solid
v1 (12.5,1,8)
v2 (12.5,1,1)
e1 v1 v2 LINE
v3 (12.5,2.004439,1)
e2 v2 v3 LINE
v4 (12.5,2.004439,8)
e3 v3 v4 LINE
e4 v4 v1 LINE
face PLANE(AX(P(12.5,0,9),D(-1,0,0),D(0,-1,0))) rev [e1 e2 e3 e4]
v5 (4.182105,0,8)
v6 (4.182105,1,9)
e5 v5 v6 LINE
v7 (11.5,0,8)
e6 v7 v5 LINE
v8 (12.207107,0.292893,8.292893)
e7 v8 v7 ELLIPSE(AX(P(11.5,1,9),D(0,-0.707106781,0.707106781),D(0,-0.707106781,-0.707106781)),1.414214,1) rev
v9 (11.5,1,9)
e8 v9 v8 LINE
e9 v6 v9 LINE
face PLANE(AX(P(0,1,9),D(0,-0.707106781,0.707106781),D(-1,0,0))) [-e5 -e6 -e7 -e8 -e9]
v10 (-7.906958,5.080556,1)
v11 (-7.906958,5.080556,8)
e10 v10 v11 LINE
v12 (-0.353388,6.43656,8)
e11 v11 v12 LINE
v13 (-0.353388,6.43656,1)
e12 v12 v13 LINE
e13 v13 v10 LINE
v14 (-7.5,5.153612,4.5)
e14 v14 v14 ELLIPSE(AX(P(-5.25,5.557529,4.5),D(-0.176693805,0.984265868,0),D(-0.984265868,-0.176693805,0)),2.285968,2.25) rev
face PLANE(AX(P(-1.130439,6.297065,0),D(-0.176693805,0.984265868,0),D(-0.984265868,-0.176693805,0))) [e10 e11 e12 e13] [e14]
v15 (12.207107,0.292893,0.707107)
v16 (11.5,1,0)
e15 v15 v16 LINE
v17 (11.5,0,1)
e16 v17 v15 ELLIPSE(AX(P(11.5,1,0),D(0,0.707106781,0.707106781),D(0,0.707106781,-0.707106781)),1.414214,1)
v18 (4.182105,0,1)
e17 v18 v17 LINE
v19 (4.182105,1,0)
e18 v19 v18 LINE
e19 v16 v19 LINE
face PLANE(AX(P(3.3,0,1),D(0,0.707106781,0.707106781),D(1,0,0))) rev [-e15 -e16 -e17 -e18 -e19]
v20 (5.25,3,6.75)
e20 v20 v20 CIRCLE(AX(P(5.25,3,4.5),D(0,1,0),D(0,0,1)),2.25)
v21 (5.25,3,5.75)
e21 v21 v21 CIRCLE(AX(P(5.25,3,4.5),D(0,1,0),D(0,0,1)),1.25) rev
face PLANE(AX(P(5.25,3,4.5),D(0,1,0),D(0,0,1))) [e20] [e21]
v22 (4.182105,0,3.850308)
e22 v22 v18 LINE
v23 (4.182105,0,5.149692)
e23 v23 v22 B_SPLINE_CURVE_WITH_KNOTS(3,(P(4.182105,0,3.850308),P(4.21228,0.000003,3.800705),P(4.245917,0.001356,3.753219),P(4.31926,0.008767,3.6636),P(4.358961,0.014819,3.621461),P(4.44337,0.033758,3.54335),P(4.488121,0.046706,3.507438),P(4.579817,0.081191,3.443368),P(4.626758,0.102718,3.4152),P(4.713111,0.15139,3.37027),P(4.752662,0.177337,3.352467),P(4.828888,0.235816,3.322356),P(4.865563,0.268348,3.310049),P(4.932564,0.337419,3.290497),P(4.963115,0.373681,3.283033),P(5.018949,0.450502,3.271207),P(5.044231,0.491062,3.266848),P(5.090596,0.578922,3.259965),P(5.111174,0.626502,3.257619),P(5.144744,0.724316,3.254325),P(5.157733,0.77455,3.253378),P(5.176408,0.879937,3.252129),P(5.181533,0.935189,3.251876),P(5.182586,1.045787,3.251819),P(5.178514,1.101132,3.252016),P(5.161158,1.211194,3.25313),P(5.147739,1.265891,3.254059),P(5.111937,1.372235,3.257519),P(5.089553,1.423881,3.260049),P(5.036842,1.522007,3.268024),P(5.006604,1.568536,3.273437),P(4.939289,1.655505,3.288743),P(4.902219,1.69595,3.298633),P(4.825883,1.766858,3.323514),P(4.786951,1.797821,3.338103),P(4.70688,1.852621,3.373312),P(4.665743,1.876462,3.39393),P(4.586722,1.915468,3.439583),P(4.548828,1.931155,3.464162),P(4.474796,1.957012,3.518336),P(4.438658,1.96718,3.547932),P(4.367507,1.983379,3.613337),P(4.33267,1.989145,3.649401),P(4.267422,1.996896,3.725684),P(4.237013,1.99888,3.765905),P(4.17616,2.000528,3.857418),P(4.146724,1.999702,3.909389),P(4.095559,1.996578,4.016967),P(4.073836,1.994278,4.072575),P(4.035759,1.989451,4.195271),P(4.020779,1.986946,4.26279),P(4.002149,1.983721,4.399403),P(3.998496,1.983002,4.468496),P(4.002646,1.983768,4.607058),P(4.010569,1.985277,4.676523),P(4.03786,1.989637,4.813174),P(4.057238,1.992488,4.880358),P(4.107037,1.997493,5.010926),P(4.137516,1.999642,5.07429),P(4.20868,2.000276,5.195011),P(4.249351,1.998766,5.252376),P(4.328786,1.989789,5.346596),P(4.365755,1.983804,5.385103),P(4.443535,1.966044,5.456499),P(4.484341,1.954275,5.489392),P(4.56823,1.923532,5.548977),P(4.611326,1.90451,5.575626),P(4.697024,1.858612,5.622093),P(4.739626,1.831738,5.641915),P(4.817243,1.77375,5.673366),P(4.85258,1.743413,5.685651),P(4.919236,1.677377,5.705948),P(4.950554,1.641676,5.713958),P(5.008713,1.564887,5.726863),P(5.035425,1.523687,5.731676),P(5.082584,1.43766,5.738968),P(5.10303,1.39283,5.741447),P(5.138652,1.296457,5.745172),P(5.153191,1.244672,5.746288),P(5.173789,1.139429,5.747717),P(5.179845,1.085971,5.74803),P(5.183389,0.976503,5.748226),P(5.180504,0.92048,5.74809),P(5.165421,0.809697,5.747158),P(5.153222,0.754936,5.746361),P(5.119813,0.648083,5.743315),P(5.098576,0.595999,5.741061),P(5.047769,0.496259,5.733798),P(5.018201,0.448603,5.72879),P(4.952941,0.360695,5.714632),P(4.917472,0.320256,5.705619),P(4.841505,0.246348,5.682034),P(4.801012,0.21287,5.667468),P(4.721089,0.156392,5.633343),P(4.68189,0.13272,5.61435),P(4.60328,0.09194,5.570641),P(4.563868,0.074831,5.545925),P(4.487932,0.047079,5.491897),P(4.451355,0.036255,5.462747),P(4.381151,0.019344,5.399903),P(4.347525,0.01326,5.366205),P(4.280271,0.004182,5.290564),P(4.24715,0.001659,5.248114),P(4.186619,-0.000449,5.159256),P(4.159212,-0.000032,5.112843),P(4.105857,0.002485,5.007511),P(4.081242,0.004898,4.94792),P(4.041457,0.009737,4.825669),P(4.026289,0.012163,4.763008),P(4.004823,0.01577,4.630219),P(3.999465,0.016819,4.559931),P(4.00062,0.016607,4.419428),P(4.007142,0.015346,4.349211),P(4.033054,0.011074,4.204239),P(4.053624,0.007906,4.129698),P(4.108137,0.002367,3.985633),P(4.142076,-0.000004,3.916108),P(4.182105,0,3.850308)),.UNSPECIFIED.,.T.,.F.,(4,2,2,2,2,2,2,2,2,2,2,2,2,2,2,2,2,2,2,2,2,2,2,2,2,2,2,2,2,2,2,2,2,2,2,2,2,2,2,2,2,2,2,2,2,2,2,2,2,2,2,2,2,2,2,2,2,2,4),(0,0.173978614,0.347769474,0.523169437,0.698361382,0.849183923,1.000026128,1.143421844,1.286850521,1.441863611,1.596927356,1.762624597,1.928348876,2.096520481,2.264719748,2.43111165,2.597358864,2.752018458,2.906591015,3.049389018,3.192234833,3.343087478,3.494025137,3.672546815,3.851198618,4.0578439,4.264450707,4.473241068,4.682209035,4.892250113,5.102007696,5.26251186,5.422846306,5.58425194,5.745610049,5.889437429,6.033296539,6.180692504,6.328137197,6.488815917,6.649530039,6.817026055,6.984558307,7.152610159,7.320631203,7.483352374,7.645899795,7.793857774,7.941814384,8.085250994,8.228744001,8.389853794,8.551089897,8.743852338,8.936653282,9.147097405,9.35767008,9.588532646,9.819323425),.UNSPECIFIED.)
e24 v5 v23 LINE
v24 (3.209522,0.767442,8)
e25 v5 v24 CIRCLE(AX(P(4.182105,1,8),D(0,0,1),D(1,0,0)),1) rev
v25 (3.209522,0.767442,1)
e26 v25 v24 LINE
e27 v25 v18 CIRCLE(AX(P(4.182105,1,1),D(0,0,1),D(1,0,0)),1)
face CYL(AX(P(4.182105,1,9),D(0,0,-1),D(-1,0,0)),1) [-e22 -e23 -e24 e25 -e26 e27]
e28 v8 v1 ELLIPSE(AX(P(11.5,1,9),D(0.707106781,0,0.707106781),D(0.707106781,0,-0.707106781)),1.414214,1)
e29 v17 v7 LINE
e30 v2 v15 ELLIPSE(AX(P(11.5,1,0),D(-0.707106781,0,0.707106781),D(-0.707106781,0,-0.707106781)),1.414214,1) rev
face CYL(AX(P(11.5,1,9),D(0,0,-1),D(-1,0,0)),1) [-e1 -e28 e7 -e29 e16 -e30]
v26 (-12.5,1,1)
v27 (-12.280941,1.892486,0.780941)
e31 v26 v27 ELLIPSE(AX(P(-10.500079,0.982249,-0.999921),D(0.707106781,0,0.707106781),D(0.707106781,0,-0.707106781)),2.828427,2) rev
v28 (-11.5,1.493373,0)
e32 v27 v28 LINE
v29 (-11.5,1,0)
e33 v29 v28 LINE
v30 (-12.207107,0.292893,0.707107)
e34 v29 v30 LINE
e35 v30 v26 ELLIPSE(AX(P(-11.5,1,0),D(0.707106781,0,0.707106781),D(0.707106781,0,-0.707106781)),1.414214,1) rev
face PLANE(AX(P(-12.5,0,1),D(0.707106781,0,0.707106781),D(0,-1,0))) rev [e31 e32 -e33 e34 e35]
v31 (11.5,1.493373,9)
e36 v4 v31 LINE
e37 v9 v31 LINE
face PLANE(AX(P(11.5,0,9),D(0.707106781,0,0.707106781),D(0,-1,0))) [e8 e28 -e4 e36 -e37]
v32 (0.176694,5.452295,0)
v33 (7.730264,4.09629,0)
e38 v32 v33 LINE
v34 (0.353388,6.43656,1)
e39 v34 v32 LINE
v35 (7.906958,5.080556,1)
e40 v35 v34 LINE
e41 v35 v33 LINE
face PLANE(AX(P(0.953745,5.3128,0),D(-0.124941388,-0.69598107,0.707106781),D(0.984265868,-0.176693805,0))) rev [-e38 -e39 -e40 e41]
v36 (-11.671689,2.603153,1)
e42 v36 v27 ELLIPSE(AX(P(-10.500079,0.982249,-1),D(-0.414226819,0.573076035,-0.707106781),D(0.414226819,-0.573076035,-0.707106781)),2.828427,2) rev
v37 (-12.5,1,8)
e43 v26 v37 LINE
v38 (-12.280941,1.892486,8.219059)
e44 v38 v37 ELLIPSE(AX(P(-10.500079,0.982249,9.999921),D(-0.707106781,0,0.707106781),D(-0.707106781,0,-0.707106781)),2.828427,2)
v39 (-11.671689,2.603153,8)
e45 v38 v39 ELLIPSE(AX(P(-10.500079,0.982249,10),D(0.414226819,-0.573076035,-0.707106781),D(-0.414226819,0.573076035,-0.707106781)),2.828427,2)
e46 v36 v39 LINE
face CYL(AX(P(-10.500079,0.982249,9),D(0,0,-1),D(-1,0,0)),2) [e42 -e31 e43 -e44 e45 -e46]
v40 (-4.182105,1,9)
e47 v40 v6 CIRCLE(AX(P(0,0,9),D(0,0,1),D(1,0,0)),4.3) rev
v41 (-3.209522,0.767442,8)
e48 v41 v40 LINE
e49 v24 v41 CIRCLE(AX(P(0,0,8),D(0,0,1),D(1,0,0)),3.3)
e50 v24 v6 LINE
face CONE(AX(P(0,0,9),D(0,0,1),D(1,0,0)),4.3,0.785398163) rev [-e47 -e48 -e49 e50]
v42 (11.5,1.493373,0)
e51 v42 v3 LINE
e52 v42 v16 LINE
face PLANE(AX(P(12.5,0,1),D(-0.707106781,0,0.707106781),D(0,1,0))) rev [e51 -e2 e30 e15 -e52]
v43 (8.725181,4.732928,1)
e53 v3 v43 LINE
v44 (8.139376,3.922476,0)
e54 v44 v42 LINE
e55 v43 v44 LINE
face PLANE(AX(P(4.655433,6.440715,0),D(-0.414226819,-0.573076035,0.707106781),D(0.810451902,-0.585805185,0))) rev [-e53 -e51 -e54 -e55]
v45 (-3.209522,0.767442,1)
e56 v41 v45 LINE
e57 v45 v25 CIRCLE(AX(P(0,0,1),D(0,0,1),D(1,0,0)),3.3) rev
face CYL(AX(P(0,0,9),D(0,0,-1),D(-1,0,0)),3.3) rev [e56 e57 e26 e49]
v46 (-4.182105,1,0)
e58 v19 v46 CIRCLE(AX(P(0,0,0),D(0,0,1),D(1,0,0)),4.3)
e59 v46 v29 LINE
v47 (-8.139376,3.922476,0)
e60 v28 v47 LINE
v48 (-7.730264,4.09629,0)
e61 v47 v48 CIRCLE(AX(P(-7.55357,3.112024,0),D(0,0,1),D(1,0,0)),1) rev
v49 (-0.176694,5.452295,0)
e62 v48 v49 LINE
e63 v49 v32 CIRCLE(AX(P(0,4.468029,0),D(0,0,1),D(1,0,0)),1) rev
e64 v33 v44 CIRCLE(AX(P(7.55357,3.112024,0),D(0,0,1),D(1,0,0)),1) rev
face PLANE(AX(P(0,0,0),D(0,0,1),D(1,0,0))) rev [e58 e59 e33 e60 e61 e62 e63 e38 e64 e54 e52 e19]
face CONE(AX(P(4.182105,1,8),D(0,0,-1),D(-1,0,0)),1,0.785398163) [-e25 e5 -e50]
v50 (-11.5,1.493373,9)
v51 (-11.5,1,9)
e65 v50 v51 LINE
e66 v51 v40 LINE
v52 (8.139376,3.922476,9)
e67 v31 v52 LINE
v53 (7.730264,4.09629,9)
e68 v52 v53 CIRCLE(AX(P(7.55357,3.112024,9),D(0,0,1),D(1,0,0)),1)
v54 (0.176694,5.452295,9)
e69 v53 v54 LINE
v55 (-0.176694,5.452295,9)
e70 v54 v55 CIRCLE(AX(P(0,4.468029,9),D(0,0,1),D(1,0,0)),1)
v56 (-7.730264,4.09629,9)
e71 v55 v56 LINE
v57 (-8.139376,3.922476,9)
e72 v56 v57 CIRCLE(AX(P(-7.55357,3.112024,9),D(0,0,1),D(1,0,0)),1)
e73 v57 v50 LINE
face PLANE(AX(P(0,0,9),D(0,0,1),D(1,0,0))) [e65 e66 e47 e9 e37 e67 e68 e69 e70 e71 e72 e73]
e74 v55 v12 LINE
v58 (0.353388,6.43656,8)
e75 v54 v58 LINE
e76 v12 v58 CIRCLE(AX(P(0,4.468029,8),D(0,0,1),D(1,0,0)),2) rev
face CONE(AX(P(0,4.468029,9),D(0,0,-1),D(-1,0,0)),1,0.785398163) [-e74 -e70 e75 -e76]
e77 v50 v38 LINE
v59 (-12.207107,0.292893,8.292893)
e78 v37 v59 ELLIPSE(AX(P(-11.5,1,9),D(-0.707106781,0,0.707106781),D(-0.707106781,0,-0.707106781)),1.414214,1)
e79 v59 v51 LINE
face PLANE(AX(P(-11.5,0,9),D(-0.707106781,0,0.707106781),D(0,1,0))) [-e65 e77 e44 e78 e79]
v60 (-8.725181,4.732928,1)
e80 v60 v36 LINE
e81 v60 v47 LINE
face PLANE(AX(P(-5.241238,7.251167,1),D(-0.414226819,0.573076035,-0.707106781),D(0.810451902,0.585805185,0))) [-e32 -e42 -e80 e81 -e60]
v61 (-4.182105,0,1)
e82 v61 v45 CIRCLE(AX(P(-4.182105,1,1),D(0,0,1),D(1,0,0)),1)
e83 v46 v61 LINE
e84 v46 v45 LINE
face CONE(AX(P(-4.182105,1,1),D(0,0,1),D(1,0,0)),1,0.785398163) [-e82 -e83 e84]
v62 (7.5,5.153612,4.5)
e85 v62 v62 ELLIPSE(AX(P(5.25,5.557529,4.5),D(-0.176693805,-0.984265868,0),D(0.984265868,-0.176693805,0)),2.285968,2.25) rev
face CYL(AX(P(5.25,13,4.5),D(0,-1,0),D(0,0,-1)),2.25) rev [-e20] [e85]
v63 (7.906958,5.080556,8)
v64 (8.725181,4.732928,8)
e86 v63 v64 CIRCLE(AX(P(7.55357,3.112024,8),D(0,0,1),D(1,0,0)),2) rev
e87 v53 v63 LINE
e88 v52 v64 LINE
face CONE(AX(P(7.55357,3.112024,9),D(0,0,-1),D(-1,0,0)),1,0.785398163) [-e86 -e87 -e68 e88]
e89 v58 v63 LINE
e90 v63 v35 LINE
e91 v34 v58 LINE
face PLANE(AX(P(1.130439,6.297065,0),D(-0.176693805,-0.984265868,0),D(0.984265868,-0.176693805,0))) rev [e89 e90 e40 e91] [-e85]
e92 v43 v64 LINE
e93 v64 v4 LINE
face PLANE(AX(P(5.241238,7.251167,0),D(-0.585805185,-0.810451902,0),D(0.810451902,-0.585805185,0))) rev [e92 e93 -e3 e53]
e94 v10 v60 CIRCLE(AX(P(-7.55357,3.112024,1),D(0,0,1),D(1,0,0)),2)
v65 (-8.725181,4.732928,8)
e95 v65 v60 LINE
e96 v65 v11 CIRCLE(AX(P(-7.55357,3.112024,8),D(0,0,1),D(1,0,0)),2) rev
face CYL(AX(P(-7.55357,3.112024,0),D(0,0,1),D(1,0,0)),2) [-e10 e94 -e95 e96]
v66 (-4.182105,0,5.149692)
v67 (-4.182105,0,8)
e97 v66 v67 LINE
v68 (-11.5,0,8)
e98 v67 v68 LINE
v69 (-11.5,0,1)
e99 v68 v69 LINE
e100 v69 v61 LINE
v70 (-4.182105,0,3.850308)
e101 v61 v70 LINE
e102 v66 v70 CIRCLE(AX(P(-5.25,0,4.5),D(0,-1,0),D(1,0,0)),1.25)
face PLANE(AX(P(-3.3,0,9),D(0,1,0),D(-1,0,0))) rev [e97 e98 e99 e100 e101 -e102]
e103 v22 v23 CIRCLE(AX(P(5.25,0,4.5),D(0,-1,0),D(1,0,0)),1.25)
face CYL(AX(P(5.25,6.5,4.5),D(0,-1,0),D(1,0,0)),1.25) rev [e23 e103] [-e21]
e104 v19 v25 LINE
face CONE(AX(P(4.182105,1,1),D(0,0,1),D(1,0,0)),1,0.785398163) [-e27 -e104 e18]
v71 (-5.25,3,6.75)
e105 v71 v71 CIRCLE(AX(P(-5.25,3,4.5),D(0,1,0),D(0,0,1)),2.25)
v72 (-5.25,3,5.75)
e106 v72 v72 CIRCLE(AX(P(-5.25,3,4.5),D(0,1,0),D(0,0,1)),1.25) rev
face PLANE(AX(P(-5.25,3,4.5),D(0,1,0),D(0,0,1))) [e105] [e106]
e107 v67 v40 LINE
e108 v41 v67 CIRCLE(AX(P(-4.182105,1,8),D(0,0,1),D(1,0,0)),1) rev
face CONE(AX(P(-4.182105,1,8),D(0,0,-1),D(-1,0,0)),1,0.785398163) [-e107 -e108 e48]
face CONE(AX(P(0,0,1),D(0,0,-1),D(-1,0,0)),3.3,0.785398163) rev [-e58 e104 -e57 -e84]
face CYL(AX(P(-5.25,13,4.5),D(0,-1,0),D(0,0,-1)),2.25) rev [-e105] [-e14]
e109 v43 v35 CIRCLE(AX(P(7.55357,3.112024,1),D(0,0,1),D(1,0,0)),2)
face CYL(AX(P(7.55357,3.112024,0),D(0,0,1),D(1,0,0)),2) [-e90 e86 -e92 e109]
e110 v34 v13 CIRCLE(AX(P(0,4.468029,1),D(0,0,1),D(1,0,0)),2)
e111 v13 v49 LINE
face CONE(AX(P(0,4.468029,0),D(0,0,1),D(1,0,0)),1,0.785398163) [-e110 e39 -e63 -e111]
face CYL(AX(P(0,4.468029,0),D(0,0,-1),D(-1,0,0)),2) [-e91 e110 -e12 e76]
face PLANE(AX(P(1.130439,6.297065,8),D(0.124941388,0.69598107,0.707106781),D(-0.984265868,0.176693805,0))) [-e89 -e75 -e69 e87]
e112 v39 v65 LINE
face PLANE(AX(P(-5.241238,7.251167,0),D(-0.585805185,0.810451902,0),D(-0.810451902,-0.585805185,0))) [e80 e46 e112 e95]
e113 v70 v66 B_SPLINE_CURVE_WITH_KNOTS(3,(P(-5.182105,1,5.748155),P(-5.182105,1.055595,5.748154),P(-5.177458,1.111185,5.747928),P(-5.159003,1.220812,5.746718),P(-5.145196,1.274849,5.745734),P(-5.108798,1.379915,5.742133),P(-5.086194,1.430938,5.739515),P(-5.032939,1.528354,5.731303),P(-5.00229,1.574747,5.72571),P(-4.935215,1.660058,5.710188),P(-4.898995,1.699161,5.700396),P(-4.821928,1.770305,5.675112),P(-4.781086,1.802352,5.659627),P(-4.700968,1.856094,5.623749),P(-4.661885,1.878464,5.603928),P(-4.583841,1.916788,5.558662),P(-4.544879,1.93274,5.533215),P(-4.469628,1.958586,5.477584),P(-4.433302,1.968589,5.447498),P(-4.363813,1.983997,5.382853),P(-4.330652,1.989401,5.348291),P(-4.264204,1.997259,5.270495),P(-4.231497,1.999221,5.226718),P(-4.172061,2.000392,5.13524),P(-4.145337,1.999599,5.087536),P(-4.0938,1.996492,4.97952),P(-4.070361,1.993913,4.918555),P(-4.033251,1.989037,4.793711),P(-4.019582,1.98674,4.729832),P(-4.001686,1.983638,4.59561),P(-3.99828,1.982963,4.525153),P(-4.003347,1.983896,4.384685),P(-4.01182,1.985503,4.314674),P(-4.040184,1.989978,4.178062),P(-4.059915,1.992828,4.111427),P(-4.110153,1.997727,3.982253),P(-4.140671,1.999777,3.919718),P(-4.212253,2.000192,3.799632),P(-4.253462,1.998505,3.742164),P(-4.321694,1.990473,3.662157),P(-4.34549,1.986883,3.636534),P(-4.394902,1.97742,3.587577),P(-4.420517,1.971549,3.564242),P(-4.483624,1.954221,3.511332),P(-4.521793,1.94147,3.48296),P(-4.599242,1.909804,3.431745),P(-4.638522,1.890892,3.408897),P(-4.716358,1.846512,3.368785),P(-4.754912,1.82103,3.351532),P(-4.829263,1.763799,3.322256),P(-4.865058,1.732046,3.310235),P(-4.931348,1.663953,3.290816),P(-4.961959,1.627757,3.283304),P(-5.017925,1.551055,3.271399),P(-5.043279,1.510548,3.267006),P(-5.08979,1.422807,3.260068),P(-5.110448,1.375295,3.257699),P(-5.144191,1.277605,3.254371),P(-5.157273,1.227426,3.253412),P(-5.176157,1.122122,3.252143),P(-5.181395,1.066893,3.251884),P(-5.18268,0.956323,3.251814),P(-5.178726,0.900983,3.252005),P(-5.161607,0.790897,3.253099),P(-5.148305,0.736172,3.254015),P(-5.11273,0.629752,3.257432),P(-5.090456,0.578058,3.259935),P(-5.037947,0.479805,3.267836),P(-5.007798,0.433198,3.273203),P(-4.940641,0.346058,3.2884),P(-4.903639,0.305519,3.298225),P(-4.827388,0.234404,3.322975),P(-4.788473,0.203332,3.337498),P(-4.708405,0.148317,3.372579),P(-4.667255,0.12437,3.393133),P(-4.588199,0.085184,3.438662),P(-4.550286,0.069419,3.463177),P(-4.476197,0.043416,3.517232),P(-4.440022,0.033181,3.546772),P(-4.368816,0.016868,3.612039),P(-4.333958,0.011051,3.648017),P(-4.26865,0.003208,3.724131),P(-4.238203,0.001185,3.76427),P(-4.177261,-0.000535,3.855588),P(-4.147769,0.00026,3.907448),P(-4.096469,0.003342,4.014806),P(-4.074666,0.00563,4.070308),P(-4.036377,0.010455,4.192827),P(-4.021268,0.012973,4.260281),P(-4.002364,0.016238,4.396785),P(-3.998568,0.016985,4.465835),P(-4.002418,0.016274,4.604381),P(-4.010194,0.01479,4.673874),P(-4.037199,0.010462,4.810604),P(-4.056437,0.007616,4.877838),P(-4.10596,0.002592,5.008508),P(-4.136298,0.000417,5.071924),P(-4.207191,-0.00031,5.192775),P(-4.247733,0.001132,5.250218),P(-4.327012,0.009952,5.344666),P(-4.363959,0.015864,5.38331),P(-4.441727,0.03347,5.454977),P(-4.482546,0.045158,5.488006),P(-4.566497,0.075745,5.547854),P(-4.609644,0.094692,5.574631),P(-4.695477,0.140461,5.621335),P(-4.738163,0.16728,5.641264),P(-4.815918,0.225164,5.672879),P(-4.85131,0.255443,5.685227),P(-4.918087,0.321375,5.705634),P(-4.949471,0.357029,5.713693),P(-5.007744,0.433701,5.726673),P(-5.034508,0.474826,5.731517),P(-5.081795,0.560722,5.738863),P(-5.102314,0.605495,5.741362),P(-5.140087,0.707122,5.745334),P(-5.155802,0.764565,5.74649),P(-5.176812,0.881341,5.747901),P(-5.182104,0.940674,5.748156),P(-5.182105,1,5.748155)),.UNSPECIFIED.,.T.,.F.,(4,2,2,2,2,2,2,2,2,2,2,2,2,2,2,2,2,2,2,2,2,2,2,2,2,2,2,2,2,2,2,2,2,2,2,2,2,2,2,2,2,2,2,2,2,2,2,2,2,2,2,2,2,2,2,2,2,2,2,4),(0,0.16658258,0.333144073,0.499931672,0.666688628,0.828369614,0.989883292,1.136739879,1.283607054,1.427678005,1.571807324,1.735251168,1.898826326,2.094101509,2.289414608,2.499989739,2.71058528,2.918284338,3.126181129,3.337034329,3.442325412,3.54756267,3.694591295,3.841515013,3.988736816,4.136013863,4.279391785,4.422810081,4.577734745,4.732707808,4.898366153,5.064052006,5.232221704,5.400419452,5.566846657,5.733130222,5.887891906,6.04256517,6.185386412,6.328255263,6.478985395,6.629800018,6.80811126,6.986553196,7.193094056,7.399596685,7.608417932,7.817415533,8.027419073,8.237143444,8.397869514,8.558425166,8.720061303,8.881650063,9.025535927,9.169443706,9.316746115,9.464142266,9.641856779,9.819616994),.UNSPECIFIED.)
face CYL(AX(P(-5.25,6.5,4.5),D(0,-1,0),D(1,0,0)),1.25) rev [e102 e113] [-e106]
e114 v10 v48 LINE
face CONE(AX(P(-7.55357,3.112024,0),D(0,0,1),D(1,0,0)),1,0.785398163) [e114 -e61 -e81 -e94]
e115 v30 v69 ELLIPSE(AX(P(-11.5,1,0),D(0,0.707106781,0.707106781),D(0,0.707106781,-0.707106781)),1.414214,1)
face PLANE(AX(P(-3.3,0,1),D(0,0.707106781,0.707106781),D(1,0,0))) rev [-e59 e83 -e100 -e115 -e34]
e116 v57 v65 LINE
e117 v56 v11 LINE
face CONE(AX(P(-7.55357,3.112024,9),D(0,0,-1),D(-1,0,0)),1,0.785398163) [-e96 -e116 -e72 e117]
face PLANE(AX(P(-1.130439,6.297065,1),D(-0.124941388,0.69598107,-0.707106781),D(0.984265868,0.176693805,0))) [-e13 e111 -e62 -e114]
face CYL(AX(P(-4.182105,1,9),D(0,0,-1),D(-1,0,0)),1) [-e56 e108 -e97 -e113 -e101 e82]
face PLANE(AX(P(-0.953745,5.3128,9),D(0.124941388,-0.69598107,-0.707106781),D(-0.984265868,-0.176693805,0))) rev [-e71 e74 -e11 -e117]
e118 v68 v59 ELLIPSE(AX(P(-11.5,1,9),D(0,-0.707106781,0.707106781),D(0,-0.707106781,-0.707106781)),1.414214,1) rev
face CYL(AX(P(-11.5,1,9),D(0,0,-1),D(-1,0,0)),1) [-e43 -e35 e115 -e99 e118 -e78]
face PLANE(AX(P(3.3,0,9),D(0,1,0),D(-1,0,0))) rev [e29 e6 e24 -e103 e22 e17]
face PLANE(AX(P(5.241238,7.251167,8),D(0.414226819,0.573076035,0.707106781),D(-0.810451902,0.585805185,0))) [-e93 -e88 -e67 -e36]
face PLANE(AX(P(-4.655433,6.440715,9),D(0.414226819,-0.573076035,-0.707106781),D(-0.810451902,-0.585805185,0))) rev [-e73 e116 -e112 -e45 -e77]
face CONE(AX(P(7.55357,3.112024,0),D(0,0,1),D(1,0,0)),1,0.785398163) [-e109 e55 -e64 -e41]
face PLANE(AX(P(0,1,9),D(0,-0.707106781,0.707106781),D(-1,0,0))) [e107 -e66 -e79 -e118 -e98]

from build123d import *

# Parameters (mm, degrees)
BOSS_EXTRUDE1_DEPTH     = 9
CUT_EXTRUDE1_DEPTH      = 17.718253497
CUT_EXTRUDE1_DEPTH_BACK = 17.718253497
CHAMFER1_SIZE           = 1
FILLET3_R               = 1
SKETCH4_R               = 1.25
CUT_EXTRUDE2_DEPTH      = 17.718253497
CUT_EXTRUDE3_START      = 3
SKETCH5_R               = 2.25
CUT_EXTRUDE3_DEPTH      = 10
FILLET2_R               = 2
CHAMFER2_SIZE           = 1
CHAMFER3_SIZE           = 1


with BuildPart() as part:
    # Sketch1 → Boss-Extrude1 (new body)
    with BuildSketch(Plane.XY):
        with BuildLine():
            Line((-3.3, 0), (-12.5, 0))
            Line((-12.5, 0), (-12.5, 6.5))
            Line((-12.5, 6.5), (12.5, 6.5))
            Line((12.5, 6.5), (12.5, 0))
            Line((12.5, 0), (3.3, 0))
            ThreePointArc((3.3, 0), (0, 3.3), (-3.3, 0))
        make_face()
    extrude(amount=BOSS_EXTRUDE1_DEPTH)

    # Sketch2 → Cut-Extrude1 (cut, two sides: drawn at the far end of the back side and taken through both)
    with BuildSketch(Plane.XY.offset(9).offset(-CUT_EXTRUDE1_DEPTH_BACK)):
        Polygon((-8.355690819, 5), (0, 6.5), (-12.5, 6.5), (-12.5, 2.004439372), align=None)
        Polygon((12.5, 6.5), (0, 6.5), (8.355690819, 5), (12.5, 2.004439372), align=None)
    extrude(amount=CUT_EXTRUDE1_DEPTH + CUT_EXTRUDE1_DEPTH_BACK, mode=Mode.SUBTRACT)

    # Chamfer1
    chamfer1_edges = [part.edges().sort_by_distance(p)[0] for p in [
        (12.5, 1.002219686, 9),
        (-12.5, 1.002219686, 0),
        (-12.5, 1.002219686, 9),
        (12.5, 1.002219686, 0),
    ]]
    chamfer(chamfer1_edges, length=CHAMFER1_SIZE)

    # Fillet3
    fillet3_edges = [part.edges().sort_by_distance(p)[0] for p in [
        (12.5, 0, 4.5),
        (3.3, 0, 4.5),
        (-12.5, 0, 4.5),
        (-3.3, 0, 4.5),
    ]]
    fillet(fillet3_edges, radius=FILLET3_R)

    # Sketch4 → Cut-Extrude2 (cut, through all)
    with BuildSketch(Plane.XZ):
        with Locations(Location((-5.25, 4.5, 0), (0, 0, 31.315725107))):
            Circle(SKETCH4_R)
        with Locations((5.25, 4.5)):
            Circle(SKETCH4_R)
    extrude(amount=-CUT_EXTRUDE2_DEPTH, mode=Mode.SUBTRACT)

    # Sketch5 → Cut-Extrude3 (cut)
    with BuildSketch(Plane(origin=(0, 0, 0), x_dir=(1, 0, 0), z_dir=(0, 1, 0)).offset(CUT_EXTRUDE3_START)):
        with Locations(Location((-5.25, -4.5, 0), (0, 0, 180))):
            Circle(SKETCH5_R)
        with Locations((5.25, -4.5)):
            Circle(SKETCH5_R)
    extrude(amount=CUT_EXTRUDE3_DEPTH, mode=Mode.SUBTRACT)

    # Fillet2
    # the kernel refuses this fillet: 2 mm, written as the material it takes off along each edge
    with BuildSketch(Plane(origin=(8.355690819, 5, -1.139765225), x_dir=(0.8104519016588886, -0.5858051852770605, 0), z_dir=(0, 0, 1))) as fillet2_piece_1:
        with BuildLine():
            CenterArc((FILLET2_R * 0.227953044968, -FILLET2_R), FILLET2_R, 90, 25.682650877)
            Line((-FILLET2_R * 0.20543317424, -FILLET2_R * 0.0987917083155), (0, 0))
            Line((0, 0), (FILLET2_R * 0.227953044968, 0))
        make_face()
    extrude(amount=11.27953045, mode=Mode.SUBTRACT)
    with BuildSketch(Plane(origin=(-8.355690819, 5, 10.139765225), x_dir=(0.9842658682259174, 0.17669380477391092, 0), z_dir=(0, 0, -1))) as fillet2_piece_2:
        with BuildLine():
            CenterArc((FILLET2_R * 0.227953044968, FILLET2_R), FILLET2_R, 244.317349123, 25.682650877)
            Line((-FILLET2_R * 0.20543317424, FILLET2_R * 0.0987917083155), (0, 0))
            Line((0, 0), (FILLET2_R * 0.227953044968, 0))
        make_face()
    extrude(amount=11.27953045, mode=Mode.SUBTRACT)
    with BuildSketch(Plane(origin=(0, 6.5, 9.897591852), x_dir=(0.9842658682259177, -0.17669380477391017, 0), z_dir=(0, 0, -1))) as fillet2_piece_3:
        with BuildLine():
            CenterArc((FILLET2_R * 0.179518370471, FILLET2_R), FILLET2_R, 249.645515661, 20.354484339)
            Line((-FILLET2_R * 0.168308991861, FILLET2_R * 0.062441401291), (0, 0))
            Line((0, 0), (FILLET2_R * 0.179518370471, 0))
        make_face()
    extrude(amount=10.795183705, mode=Mode.SUBTRACT)
    with BuildSketch(Plane(origin=(-12.5, 2.004439372, -1.554843318), x_dir=(0.8104519016588881, 0.5858051852770613, 0), z_dir=(0, 0, 1))) as fillet2_piece_4:
        with BuildLine():
            CenterArc((1.021937327, -2), FILLET2_R, 90, 53.119715667)
            Line((-0.577845108, -0.799709969), (-0.737823352, -0.679680966))
            ThreePointArc((-0.737823352, -0.679680966), (-0.750496173, -0.696888762), (-0.16209038, 0.117161037))
            Line((-0.16209038, 0.117161037), (0, 0.2))
            Line((0, 0.2), (1.021937327, 0.2))
            Line((1.021937327, 0.2), (1.021937327, 0))
        make_face()
    extrude(amount=12.109686635, mode=Mode.SUBTRACT)

    # Chamfer2
    chamfer2_edges = [part.edges().sort_by_distance(p)[0] for p in [
        (7.841052367, 0, 0),
        (3.562652612, 0.214965561, 0),
        (-7.841052367, 0, 0),
        (-3.562652612, 0.214965561, 0),
        (0, 3.3, 0),
    ]]
    chamfer(chamfer2_edges, length=CHAMFER2_SIZE)
    # the kernel refuses this chamfer: 1 mm, written as the material it takes off along each edge
    with BuildSketch(Plane(origin=(8.725180777, 4.732927849, 0), x_dir=(-0.585583702243233, -0.8101454835006636, -0.027495876610586348), z_dir=(0.8104519016588884, -0.5858051852770609, 0)), Plane(origin=(-13.584225368, 1.220747161, 0), x_dir=(0.5855837022432331, -0.8101454835006635, -0.027495876610586348), z_dir=(0.8104519016588883, 0.585805185277061, 0))) as chamfer2_2_piece_1:
        with BuildLine():
            Line((1.028673195, 0), (-0.056547155, -1.027117794))
            Line((-0.056547155, -1.027117794), (-0.076539593, -1.026567876))
            ThreePointArc((-0.076539593, -1.026567876), (-0.034129227, -0.51339783), (-0.019992438, 0.000549918))
            Line((-0.019992438, 0.000549918), (0.000549918, 0.019992438))
            ThreePointArc((0.000549918, 0.019992438), (0.514497665, 0.00585565), (1.029223113, 0.019992438))
            Line((1.029223113, 0.019992438), (1.028673195, 0))
        make_face()
    extrude(amount=5.995475588, mode=Mode.SUBTRACT)
    with BuildSketch(Plane(origin=(7.553570406, 3.112024045, 0), x_dir=(0.1766938047737976, 0.9842658682259378, 0), z_dir=(-0.9842658682259378, 0.1766938047737976, 0))) as chamfer2_2_piece_2:
        with BuildLine():
            Line((0.971715729, 0.028284271), (2.028284271, -1.028284271))
            Line((2.028284271, -1.028284271), (2.048284271, -1.028284271))
            ThreePointArc((2.048284271, -1.028284271), (2.02, -0.514142136), (2.02, 0))
            Line((2.02, 0), (2, 0.02))
            ThreePointArc((2, 0.02), (1.485857864, 0.02), (0.971715729, 0.048284271))
            Line((0.971715729, 0.048284271), (0.971715729, 0.028284271))
        make_face()
    revolve(axis=Axis((7.553570406, 3.112024045, 0), (0, 0, -1)), revolution_arc=25.682650877, mode=Mode.SUBTRACT)
    with BuildSketch(Plane(origin=(0.35338761, 6.436560432, 0), x_dir=(-0.176626999834447, -0.9838937339463534, -0.027495876610586348), z_dir=(0.9842658682259174, -0.17669380477391067, 0)), Plane(origin=(-7.906958016, 5.080555782, 0), x_dir=(0.17662699983444718, -0.9838937339463534, -0.02749587661058635), z_dir=(0.9842658682259174, 0.17669380477391086, 0))) as chamfer2_2_piece_3:
        with BuildLine():
            Line((1.028673195, 0), (-0.056547155, -1.027117794))
            Line((-0.056547155, -1.027117794), (-0.076539593, -1.026567876))
            ThreePointArc((-0.076539593, -1.026567876), (-0.034129227, -0.51339783), (-0.019992438, 0.000549918))
            Line((-0.019992438, 0.000549918), (0.000549918, 0.019992438))
            ThreePointArc((0.000549918, 0.019992438), (0.514497665, 0.00585565), (1.029223113, 0.019992438))
            Line((1.029223113, 0.019992438), (1.028673195, 0))
        make_face()
    extrude(amount=7.674319155, mode=Mode.SUBTRACT)
    with BuildSketch(Plane(origin=(0, 4.468028696, 0), x_dir=(0.1766938047739827, 0.9842658682259047, 0), z_dir=(0.9842658682259047, -0.1766938047739827, 0))) as chamfer2_2_piece_4:
        with BuildLine():
            Line((0.971715729, -0.028284271), (2.028284271, 1.028284271))
            Line((2.028284271, 1.028284271), (2.048284271, 1.028284271))
            ThreePointArc((2.048284271, 1.028284271), (2.02, 0.514142136), (2.02, 0))
            Line((2.02, 0), (2, -0.02))
            ThreePointArc((2, -0.02), (1.485857864, -0.02), (0.971715729, -0.048284271))
            Line((0.971715729, -0.048284271), (0.971715729, -0.028284271))
        make_face()
    revolve(axis=Axis((0, 4.468028696, 0), (0, 0, 1)), revolution_arc=20.354484339, mode=Mode.SUBTRACT)
    with BuildSketch(Plane(origin=(-7.553570406, 3.112024045, 0), x_dir=(-0.17669380477398322, 0.9842658682259045, 0), z_dir=(0.9842658682259045, 0.17669380477398322, 0))) as chamfer2_2_piece_5:
        with BuildLine():
            Line((0.971715729, -0.028284271), (2.028284271, 1.028284271))
            Line((2.028284271, 1.028284271), (2.048284271, 1.028284271))
            ThreePointArc((2.048284271, 1.028284271), (2.02, 0.514142136), (2.02, 0))
            Line((2.02, 0), (2, -0.02))
            ThreePointArc((2, -0.02), (1.485857864, -0.02), (0.971715729, -0.048284271))
            Line((0.971715729, -0.048284271), (0.971715729, -0.028284271))
        make_face()
    revolve(axis=Axis((-7.553570406, 3.112024045, 0), (0, 0, 1)), revolution_arc=25.682650877, mode=Mode.SUBTRACT)

    # Chamfer3
    chamfer3_edges = [part.edges().sort_by_distance(p)[0] for p in [
        (7.841052367, 0, 9),
        (3.562652612, 0.214965561, 9),
        (-7.841052367, 0, 9),
        (-3.562652612, 0.214965561, 9),
        (0, 3.3, 9),
    ]]
    chamfer(chamfer3_edges, length=CHAMFER3_SIZE)
    # the kernel refuses this chamfer: 1 mm, written as the material it takes off along each edge
    with BuildSketch(Plane(origin=(8.725180777, 4.732927849, 9), x_dir=(-0.585583702243233, -0.8101454835006636, 0.027495876610585605), z_dir=(0.8104519016588884, -0.5858051852770609, 0)), Plane(origin=(-13.584225368, 1.220747161, 9), x_dir=(0.5855837022432332, -0.8101454835006637, 0.027495876610585605), z_dir=(0.8104519016588883, 0.585805185277061, 0))) as chamfer3_2_piece_1:
        with BuildLine():
            Line((1.028673195, 0), (-0.056547155, 1.027117794))
            Line((-0.056547155, 1.027117794), (-0.076539593, 1.026567876))
            ThreePointArc((-0.076539593, 1.026567876), (-0.034129227, 0.51339783), (-0.019992438, -0.000549918))
            Line((-0.019992438, -0.000549918), (0.000549918, -0.019992438))
            ThreePointArc((0.000549918, -0.019992438), (0.514497665, -0.00585565), (1.029223113, -0.019992438))
            Line((1.029223113, -0.019992438), (1.028673195, 0))
        make_face()
    extrude(amount=5.995475588, mode=Mode.SUBTRACT)
    with BuildSketch(Plane(origin=(7.553570406, 3.112024045, 9), x_dir=(0.1766938047737976, 0.9842658682259378, 0), z_dir=(-0.9842658682259378, 0.1766938047737976, 0))) as chamfer3_2_piece_2:
        with BuildLine():
            Line((0.971715729, -0.028284271), (2.028284271, 1.028284271))
            Line((2.028284271, 1.028284271), (2.048284271, 1.028284271))
            ThreePointArc((2.048284271, 1.028284271), (2.02, 0.514142136), (2.02, 0))
            Line((2.02, 0), (2, -0.02))
            ThreePointArc((2, -0.02), (1.485857864, -0.02), (0.971715729, -0.048284271))
            Line((0.971715729, -0.048284271), (0.971715729, -0.028284271))
        make_face()
    revolve(axis=Axis((7.553570406, 3.112024045, 9), (0, 0, -1)), revolution_arc=25.682650877, mode=Mode.SUBTRACT)
    with BuildSketch(Plane(origin=(0.35338761, 6.436560432, 9), x_dir=(-0.176626999834447, -0.9838937339463534, 0.027495876610585612), z_dir=(0.9842658682259174, -0.17669380477391067, 0)), Plane(origin=(-7.906958016, 5.080555782, 9), x_dir=(0.17662699983444718, -0.9838937339463534, 0.027495876610585612), z_dir=(0.9842658682259174, 0.17669380477391086, 0))) as chamfer3_2_piece_3:
        with BuildLine():
            Line((1.028673195, 0), (-0.056547155, 1.027117794))
            Line((-0.056547155, 1.027117794), (-0.076539593, 1.026567876))
            ThreePointArc((-0.076539593, 1.026567876), (-0.034129227, 0.51339783), (-0.019992438, -0.000549918))
            Line((-0.019992438, -0.000549918), (0.000549918, -0.019992438))
            ThreePointArc((0.000549918, -0.019992438), (0.514497665, -0.00585565), (1.029223113, -0.019992438))
            Line((1.029223113, -0.019992438), (1.028673195, 0))
        make_face()
    extrude(amount=7.674319155, mode=Mode.SUBTRACT)
    with BuildSketch(Plane(origin=(0, 4.468028696, 9), x_dir=(0.1766938047739827, 0.9842658682259047, 0), z_dir=(0.9842658682259047, -0.1766938047739827, 0))) as chamfer3_2_piece_4:
        with BuildLine():
            Line((0.971715729, 0.028284271), (2.028284271, -1.028284271))
            Line((2.028284271, -1.028284271), (2.048284271, -1.028284271))
            ThreePointArc((2.048284271, -1.028284271), (2.02, -0.514142136), (2.02, 0))
            Line((2.02, 0), (2, 0.02))
            ThreePointArc((2, 0.02), (1.485857864, 0.02), (0.971715729, 0.048284271))
            Line((0.971715729, 0.048284271), (0.971715729, 0.028284271))
        make_face()
    revolve(axis=Axis((0, 4.468028696, 9), (0, 0, 1)), revolution_arc=20.354484339, mode=Mode.SUBTRACT)
    with BuildSketch(Plane(origin=(-7.553570406, 3.112024045, 9), x_dir=(-0.17669380477398322, 0.9842658682259045, 0), z_dir=(0.9842658682259045, 0.17669380477398322, 0))) as chamfer3_2_piece_5:
        with BuildLine():
            Line((0.971715729, 0.028284271), (2.028284271, -1.028284271))
            Line((2.028284271, -1.028284271), (2.048284271, -1.028284271))
            ThreePointArc((2.048284271, -1.028284271), (2.02, -0.514142136), (2.02, 0))
            Line((2.02, 0), (2, 0.02))
            ThreePointArc((2, 0.02), (1.485857864, 0.02), (0.971715729, 0.048284271))
            Line((0.971715729, 0.048284271), (0.971715729, 0.028284271))
        make_face()
    revolve(axis=Axis((-7.553570406, 3.112024045, 9), (0, 0, 1)), revolution_arc=25.682650877, mode=Mode.SUBTRACT)


solid = part.part
